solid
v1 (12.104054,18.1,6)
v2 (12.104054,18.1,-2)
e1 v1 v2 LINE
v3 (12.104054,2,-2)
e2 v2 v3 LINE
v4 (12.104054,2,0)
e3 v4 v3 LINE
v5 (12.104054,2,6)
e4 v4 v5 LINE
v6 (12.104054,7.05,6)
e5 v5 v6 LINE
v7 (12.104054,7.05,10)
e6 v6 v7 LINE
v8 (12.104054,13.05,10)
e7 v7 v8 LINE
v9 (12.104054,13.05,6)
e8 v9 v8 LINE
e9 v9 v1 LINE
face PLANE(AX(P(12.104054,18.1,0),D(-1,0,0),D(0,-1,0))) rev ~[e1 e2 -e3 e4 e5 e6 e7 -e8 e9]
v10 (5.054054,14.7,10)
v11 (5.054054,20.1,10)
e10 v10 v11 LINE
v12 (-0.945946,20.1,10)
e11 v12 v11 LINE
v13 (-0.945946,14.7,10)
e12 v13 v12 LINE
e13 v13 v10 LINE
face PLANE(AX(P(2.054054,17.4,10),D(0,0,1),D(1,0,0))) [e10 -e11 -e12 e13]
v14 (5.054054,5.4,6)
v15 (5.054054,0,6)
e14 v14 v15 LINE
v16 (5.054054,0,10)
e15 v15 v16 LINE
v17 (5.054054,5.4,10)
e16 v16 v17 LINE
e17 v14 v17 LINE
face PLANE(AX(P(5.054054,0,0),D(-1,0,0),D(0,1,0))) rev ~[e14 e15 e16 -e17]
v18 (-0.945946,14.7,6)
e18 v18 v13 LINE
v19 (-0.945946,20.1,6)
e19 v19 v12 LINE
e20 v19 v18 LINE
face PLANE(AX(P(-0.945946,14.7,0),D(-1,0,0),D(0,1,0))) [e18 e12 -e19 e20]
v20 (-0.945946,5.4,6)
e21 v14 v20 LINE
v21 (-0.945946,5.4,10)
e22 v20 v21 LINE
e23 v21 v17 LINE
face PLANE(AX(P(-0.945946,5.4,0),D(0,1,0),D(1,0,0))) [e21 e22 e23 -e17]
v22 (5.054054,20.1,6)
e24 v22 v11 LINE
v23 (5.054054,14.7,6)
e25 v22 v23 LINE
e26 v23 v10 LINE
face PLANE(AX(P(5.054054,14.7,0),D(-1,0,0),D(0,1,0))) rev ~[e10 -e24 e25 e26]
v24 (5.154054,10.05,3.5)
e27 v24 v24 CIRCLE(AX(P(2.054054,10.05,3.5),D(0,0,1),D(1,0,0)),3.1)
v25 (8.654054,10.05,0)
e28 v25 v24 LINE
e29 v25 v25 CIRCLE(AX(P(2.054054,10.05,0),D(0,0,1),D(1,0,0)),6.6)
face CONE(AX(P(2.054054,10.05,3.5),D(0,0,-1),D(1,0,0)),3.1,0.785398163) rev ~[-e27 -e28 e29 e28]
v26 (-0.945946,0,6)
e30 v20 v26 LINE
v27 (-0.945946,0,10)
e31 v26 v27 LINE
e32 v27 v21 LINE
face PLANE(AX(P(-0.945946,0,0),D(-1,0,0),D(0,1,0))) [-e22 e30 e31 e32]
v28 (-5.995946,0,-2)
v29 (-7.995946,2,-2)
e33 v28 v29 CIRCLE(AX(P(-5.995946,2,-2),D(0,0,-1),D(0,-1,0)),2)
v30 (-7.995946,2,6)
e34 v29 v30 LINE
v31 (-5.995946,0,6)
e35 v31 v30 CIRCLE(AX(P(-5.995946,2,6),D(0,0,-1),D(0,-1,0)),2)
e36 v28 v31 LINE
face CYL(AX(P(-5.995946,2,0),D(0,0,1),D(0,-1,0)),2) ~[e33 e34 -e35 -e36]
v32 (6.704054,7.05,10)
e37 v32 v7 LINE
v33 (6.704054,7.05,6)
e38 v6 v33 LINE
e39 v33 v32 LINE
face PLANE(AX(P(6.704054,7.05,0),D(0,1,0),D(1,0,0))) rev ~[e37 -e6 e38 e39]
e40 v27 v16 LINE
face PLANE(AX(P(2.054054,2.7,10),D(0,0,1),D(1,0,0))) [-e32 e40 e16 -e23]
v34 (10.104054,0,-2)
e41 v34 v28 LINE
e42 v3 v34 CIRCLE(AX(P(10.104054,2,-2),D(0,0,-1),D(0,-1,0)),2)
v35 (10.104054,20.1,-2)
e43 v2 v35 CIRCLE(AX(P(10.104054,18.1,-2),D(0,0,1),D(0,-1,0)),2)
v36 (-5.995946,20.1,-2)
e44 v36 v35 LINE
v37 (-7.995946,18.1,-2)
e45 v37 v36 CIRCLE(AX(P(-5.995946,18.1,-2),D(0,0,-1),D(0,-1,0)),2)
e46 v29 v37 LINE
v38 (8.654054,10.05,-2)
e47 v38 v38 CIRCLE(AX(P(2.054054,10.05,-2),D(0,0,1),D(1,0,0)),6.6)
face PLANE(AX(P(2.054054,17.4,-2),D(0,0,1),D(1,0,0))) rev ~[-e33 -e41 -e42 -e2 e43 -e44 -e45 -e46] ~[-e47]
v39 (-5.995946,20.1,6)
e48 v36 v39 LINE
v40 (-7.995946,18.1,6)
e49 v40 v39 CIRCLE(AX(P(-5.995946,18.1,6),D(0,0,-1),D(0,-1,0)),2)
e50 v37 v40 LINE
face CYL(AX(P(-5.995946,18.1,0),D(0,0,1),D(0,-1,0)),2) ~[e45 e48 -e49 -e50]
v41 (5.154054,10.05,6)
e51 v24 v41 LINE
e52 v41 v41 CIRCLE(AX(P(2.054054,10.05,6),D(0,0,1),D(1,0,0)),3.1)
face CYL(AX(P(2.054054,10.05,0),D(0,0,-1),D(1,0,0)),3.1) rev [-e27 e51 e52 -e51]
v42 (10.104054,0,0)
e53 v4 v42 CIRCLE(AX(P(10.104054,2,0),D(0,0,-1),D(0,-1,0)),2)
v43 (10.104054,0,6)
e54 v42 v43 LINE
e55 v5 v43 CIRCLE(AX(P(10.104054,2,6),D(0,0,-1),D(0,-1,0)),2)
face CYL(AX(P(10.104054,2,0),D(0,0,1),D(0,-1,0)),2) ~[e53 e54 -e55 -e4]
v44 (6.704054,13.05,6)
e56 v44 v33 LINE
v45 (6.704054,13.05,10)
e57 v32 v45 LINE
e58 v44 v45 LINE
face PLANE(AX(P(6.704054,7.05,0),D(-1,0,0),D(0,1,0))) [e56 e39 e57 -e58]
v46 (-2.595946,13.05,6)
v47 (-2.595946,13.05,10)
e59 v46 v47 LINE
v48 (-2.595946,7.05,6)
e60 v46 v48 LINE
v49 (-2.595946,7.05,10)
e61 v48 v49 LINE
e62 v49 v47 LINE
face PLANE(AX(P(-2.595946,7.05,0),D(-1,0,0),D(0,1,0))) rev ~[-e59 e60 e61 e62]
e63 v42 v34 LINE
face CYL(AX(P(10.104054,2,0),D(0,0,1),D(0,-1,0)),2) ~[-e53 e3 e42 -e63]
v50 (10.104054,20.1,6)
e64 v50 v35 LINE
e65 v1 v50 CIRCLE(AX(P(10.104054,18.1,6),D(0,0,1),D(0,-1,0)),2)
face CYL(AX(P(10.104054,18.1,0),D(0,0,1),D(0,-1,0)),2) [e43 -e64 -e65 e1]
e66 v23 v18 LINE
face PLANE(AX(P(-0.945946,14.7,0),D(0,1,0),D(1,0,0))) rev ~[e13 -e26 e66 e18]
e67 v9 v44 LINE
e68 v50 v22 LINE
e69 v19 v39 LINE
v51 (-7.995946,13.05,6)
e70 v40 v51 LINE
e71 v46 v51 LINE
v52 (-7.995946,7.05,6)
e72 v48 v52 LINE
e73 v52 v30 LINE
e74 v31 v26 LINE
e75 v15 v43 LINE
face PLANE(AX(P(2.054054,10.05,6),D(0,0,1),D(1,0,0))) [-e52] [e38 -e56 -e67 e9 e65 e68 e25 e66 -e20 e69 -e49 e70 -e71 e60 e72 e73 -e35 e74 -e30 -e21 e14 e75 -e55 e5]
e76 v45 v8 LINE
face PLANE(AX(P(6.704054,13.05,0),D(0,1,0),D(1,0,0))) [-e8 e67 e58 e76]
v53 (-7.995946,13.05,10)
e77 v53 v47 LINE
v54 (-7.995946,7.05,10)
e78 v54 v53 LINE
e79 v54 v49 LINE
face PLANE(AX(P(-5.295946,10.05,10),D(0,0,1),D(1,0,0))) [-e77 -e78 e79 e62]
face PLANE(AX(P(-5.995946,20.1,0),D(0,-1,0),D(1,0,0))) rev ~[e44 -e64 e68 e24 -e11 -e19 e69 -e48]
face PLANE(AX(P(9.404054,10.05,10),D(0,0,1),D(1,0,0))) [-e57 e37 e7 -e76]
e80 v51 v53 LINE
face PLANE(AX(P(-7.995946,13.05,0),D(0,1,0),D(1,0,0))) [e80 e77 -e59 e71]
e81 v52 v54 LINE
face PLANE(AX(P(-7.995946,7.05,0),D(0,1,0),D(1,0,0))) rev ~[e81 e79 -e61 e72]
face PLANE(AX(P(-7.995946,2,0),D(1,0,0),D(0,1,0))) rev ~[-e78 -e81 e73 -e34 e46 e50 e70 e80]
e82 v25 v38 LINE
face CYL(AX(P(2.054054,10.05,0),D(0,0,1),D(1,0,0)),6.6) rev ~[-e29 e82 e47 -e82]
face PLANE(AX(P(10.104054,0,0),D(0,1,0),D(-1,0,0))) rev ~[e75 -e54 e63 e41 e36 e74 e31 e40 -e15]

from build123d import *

# Parameters (mm, degrees)
F0_R     = 3.1
F0_W     = 5.4
F0_H     = 6
F0_W_2   = 6
F0_H_2   = 5.4
F1_DEPTH = 6
F2_DEPTH = 10
F3_R     = 2
F4_SIZE  = 3.5
F5_DEPTH = 2


# Not quite as in the source:
# - a feature names something its author has since deleted; it is built from what else it names


with BuildPart() as f1:
    # F0 (on Top) → F1 (new body)
    with BuildSketch(Plane.XY):
        Polygon((-7.9959459106, 7.05), (-7.9959459106, 0), (-0.9459459106, 0), (-0.9459459106, 5.4), (5.0540540894, 5.4), (5.0540540894, 0), (12.1040540894, 0), (12.1040540894, 7.05), (6.7040540894, 7.05), (6.7040540894, 13.05), (12.1040540894, 13.05), (12.1040540894, 20.1), (5.0540540894, 20.1), (5.0540540894, 14.7), (-0.9459459106, 14.7), (-0.9459459106, 20.1), (-7.9959459106, 20.1), (-7.9959459106, 13.05), (-2.5959459106, 13.05), (-2.5959459106, 7.05), align=None)
        with Locations((2.0540540894, 10.05)):
            Circle(F0_R, mode=Mode.SUBTRACT)
        with Locations((9.4040540894, 10.05)):
            Rectangle(F0_W, F0_H)
        with Locations((-5.2959459106, 10.05)):
            Rectangle(F0_W, F0_H)
        with Locations((2.0540540894, 17.4)):
            Rectangle(F0_W_2, F0_H_2)
        with Locations((2.0540540894, 2.7)):
            Rectangle(F0_W_2, F0_H_2)
    extrude(amount=F1_DEPTH)

    # F0 (on Top) → F2 (join)
    with BuildSketch(Plane.XY):
        with Locations((2.0540540894, 17.4)):
            Rectangle(F0_W_2, F0_H_2)
        with Locations((-5.2959459106, 10.05)):
            Rectangle(F0_W, F0_H)
        with Locations((2.0540540894, 2.7)):
            Rectangle(F0_W_2, F0_H_2)
        with Locations((9.4040540894, 10.05)):
            Rectangle(F0_W, F0_H)
    extrude(amount=F2_DEPTH)

    # F3
    f3_edges = [f1.edges().sort_by_distance(p)[0] for p in [
        (-7.995946, 0, 3),
        (12.104054, 0, 3),
        (12.104054, 20.1, 3),
        (-7.995946, 20.1, 3),
    ]]
    fillet(f3_edges, radius=F3_R)

    # F4
    f4_edges = [f1.edges().sort_by_distance(p)[0] for p in [
        (-1.045946, 10.05, 0),
    ]]
    chamfer(f4_edges, length=F4_SIZE)

    # F5 (add): a face of the model
    f5_faces = [f1.faces().sort_by_distance(p)[0] for p in [
        (-4.8302028367, 10.05, 0),
    ]]
    extrude(f5_faces, amount=F5_DEPTH)


solid = f1.part
